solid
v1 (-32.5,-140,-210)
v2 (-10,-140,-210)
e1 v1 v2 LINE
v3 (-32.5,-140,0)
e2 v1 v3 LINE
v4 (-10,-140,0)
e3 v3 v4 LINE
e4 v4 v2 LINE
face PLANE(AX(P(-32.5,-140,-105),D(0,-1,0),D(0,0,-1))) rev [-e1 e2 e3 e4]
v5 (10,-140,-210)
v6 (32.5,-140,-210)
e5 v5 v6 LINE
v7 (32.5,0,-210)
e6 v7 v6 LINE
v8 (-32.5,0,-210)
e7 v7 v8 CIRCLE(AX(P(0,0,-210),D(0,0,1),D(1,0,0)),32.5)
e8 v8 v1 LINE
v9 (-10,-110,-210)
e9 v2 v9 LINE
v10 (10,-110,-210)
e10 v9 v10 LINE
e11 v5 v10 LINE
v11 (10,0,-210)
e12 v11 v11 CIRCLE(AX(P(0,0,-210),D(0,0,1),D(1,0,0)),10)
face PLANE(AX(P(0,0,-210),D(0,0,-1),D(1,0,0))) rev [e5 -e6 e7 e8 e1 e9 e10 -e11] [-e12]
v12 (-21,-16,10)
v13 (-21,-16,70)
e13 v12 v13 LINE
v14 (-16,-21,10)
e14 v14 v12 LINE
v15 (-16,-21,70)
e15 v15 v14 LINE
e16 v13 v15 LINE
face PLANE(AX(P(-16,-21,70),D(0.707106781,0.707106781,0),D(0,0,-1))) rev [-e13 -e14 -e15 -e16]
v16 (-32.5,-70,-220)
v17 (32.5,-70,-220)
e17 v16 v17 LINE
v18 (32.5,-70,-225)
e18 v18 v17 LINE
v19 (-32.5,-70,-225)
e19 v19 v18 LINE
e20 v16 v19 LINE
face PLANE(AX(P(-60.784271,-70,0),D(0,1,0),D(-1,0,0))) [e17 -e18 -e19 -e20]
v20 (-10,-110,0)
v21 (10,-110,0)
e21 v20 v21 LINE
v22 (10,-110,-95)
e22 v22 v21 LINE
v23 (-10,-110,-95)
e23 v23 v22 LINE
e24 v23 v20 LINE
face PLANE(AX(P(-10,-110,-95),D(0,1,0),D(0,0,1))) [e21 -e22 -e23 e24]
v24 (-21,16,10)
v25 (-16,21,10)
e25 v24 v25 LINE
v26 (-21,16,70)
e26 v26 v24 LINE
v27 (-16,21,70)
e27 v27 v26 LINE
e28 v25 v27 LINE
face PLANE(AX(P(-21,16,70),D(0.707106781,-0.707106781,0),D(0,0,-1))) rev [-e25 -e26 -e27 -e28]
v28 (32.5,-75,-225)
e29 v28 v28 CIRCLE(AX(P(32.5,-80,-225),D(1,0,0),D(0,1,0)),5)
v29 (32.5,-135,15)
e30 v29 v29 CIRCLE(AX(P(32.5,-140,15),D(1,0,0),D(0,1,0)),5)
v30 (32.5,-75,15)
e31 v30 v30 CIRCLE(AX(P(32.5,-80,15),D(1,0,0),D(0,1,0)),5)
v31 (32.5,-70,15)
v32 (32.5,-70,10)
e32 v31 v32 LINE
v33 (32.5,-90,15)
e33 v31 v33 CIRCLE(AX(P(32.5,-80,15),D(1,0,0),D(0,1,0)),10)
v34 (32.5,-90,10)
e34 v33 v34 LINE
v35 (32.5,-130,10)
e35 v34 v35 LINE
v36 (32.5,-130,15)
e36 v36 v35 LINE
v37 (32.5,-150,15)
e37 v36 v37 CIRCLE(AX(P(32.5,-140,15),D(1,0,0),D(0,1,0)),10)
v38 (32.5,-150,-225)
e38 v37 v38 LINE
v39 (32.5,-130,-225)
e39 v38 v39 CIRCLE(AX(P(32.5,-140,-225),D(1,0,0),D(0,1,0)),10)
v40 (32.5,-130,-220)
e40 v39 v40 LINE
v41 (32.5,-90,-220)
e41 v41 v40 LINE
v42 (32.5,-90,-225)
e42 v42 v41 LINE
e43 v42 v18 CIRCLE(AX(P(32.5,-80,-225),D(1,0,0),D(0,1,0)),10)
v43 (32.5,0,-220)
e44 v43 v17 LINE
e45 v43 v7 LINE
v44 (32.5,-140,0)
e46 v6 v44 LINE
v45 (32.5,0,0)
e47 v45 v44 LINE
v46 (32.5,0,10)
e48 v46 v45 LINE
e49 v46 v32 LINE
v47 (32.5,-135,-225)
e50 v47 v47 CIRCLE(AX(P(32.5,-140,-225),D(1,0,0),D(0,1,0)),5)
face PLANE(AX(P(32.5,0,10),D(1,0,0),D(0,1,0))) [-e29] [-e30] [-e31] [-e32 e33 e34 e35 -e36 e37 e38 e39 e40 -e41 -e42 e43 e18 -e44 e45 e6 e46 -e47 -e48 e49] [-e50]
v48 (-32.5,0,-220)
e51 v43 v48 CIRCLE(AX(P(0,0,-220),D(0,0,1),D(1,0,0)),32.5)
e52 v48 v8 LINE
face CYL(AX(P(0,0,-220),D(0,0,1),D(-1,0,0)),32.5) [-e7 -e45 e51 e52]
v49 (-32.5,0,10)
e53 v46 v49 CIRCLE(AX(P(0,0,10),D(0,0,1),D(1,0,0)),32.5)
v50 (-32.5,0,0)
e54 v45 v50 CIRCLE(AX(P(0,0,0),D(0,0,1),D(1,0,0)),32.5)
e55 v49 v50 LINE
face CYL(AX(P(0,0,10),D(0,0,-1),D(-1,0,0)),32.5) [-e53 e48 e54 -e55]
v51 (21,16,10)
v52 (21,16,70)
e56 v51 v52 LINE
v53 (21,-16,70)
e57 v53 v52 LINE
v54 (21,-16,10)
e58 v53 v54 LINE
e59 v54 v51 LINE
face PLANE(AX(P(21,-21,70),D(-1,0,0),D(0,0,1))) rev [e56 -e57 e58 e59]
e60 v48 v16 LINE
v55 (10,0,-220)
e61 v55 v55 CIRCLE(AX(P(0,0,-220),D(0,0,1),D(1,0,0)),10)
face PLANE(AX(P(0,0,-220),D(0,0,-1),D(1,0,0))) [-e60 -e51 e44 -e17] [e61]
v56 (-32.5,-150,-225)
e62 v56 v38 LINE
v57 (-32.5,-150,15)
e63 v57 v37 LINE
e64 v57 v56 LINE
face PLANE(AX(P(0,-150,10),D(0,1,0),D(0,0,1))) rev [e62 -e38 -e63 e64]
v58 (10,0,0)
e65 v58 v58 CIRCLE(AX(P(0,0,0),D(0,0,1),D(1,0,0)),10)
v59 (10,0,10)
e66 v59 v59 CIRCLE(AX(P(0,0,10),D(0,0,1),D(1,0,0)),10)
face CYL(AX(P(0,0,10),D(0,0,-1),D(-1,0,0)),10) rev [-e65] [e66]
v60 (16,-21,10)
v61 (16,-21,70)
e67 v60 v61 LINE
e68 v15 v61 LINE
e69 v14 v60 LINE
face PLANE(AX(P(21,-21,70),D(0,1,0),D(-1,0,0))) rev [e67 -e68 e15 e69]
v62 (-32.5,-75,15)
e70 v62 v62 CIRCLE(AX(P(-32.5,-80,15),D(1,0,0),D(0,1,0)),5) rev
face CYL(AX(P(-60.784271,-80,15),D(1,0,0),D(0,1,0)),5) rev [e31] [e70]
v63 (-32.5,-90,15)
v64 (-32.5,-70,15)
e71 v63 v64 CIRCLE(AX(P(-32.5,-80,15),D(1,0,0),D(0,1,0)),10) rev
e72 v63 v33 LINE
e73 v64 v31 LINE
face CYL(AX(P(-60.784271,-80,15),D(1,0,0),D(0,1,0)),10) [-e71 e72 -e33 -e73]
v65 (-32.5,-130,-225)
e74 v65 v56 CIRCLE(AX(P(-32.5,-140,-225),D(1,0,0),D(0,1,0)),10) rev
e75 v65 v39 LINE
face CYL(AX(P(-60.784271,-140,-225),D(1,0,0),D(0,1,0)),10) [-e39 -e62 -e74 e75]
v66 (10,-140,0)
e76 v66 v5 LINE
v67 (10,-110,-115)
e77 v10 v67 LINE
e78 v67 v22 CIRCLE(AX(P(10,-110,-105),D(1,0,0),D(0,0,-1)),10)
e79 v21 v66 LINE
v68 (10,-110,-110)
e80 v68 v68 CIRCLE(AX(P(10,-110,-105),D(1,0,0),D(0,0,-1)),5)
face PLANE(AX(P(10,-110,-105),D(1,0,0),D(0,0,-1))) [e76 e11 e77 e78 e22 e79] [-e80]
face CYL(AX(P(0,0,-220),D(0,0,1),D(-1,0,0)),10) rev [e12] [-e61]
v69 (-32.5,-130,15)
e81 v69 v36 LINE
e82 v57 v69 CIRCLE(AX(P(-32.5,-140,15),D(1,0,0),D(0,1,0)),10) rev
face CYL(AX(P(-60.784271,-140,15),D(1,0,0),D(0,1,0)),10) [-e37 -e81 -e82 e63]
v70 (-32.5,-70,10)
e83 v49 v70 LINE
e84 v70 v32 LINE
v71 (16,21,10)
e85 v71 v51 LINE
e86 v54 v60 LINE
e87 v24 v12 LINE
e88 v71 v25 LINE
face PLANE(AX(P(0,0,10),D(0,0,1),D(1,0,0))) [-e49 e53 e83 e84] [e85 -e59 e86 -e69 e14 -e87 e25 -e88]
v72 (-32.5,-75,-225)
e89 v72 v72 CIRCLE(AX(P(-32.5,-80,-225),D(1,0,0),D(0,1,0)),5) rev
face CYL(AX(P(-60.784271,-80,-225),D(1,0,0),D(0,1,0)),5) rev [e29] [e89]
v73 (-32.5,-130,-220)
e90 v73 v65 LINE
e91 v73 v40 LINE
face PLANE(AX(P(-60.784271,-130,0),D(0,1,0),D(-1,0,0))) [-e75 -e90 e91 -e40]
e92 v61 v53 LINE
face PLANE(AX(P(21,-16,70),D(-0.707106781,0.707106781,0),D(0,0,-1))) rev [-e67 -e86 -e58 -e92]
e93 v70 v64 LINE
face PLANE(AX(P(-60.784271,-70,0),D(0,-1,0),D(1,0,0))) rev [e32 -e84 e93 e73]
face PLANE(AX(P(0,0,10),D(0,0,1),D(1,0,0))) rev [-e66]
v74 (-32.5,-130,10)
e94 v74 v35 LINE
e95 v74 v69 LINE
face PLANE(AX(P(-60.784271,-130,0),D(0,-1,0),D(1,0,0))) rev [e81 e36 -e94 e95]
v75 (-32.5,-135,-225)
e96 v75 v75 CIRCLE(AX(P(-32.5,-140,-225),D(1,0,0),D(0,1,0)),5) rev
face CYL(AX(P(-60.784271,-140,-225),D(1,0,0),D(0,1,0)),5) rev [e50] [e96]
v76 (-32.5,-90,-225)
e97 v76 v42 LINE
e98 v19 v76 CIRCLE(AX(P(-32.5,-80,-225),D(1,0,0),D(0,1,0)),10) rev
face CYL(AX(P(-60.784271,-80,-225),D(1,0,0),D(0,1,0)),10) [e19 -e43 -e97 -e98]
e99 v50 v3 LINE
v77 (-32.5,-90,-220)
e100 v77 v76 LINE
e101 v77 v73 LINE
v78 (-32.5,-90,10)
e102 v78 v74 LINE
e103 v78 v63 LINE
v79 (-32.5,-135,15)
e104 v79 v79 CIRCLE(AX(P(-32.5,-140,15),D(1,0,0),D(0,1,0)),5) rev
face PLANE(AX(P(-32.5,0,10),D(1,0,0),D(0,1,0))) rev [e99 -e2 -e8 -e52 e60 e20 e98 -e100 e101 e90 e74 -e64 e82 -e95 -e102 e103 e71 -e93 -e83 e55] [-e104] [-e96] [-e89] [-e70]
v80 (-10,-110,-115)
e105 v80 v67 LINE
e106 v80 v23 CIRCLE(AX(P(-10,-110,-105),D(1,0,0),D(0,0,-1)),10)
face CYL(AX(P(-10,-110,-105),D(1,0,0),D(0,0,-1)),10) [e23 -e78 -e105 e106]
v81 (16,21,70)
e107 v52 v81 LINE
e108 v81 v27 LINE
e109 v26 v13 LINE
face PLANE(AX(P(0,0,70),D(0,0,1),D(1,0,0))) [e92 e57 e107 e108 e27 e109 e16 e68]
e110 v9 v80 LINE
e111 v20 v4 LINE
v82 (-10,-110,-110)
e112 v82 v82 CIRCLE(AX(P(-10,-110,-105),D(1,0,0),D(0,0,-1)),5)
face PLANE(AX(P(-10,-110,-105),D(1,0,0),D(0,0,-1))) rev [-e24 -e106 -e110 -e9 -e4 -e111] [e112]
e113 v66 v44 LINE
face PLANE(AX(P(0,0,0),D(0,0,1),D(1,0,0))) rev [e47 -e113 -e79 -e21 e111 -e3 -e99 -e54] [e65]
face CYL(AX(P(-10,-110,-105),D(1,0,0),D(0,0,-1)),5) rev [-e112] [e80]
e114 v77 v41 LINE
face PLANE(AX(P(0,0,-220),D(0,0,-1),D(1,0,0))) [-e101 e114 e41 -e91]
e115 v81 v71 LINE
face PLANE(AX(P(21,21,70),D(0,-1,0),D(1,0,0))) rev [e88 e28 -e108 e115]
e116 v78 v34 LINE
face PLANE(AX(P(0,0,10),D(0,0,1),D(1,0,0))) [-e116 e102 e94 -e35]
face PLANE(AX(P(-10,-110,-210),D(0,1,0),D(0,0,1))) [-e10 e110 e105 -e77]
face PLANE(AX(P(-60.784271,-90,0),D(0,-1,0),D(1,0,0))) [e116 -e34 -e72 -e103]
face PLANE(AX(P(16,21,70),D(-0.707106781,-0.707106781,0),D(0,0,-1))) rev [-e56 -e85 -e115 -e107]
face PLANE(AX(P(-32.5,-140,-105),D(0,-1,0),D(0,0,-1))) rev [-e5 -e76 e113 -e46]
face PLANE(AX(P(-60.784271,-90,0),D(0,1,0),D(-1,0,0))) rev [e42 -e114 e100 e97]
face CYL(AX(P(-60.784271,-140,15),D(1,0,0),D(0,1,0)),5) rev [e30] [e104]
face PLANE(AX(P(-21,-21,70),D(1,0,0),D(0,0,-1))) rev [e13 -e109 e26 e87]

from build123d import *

# Parameters (mm, degrees)
BOSS_EXTRUDE1_DEPTH       = 10
SKETCH2_W                 = 65
SKETCH2_H                 = 10
BOSS_EXTRUDE2_DEPTH       = 105
SKETCH3_W                 = 42
SKETCH3_H                 = 42
BOSS_EXTRUDE3_DEPTH       = 60
CHAMFER1_SIZE             = 5
BOSS_EXTRUDE6_START       = -235
BOSS_EXTRUDE6_OUTLINE_W   = 65
BOSS_EXTRUDE6_OUTLINE_H   = 20
BOSS_EXTRUDE6_DEPTH       = 15
BOSS_EXTRUDE6_START_2     = 10
BOSS_EXTRUDE6_2_OUTLINE_W = 65
BOSS_EXTRUDE6_2_OUTLINE_H = 20
BOSS_EXTRUDE6_2_DEPTH     = 15
BOSS_EXTRUDE6_START_3     = -32.5
BOSS_EXTRUDE6_3_OUTLINE_R = 5
BOSS_EXTRUDE6_3_DEPTH     = 65
BOSS_EXTRUDE9_DEPTH       = 10
BOSS_EXTRUDE9_DEPTH_BACK  = 10
SKETCH5_R                 = 5


with BuildPart() as part:
    # Sketch1 → Boss-Extrude1 (new body)
    with BuildSketch(Plane.XY):
        with BuildLine():
            Line((32.5, -150), (32.5, 0))
            ThreePointArc((32.5, 0), (0, -32.5), (-32.5, 0))
            Line((-32.5, 0), (-32.5, -150))
            Line((-32.5, -150), (32.5, -150))
        make_face()
        with BuildLine():
            ThreePointArc((-10, 0), (0, 10), (10, 0))
            Line((10, 0), (32.5, 0))
            ThreePointArc((32.5, 0), (0, 32.5), (-32.5, 0))
            Line((-32.5, 0), (-10, 0))
        make_face()
        with BuildLine():
            Line((32.5, 0), (10, 0))
            ThreePointArc((10, 0), (0, -10), (-10, 0))
            Line((-10, 0), (-32.5, 0))
            ThreePointArc((-32.5, 0), (0, -32.5), (32.5, 0))
        make_face()
    extrude(amount=BOSS_EXTRUDE1_DEPTH)

    # Sketch2 → Boss-Extrude2 (add)
    with BuildSketch(Plane(origin=(0, 0, 0), x_dir=(-1, 0, 0), z_dir=(0, 0, -1))):
        with Locations((0, -145)):
            Rectangle(SKETCH2_W, SKETCH2_H)
    extrude(amount=BOSS_EXTRUDE2_DEPTH)

    # Mirror1: part across plane


with BuildPart() as part_1:
    add(part.part)
    add(part.part.mirror(Plane(origin=(0, 0, -105), x_dir=(1, 0, 0), z_dir=(0, 0, -1))))

    # Sketch3 → Boss-Extrude3 (add)
    with BuildSketch(Plane.XY.offset(10)):
        Rectangle(SKETCH3_W, SKETCH3_H)
    extrude(amount=BOSS_EXTRUDE3_DEPTH)

    # Chamfer1
    chamfer1_edges = [part_1.edges().sort_by_distance(p)[0] for p in [
        (-21, 21, 40),
        (-21, -21, 40),
        (21, -21, 40),
        (21, 21, 40),
    ]]
    chamfer(chamfer1_edges, length=CHAMFER1_SIZE)

    # Boss-Extrude6: read off the stored shape, not the designer's step
    # Boss-Extrude6 outline → Boss-Extrude6 (add)
    with BuildSketch(Plane.XY.offset(BOSS_EXTRUDE6_START)):
        with Locations((0, -140)):
            Rectangle(BOSS_EXTRUDE6_OUTLINE_W, BOSS_EXTRUDE6_OUTLINE_H)
        with Locations((0, -80)):
            Rectangle(BOSS_EXTRUDE6_OUTLINE_W, BOSS_EXTRUDE6_OUTLINE_H)
    extrude(amount=BOSS_EXTRUDE6_DEPTH)

    # Boss-Extrude6 2 outline → Boss-Extrude6 2 (add)
    with BuildSketch(Plane.XY.offset(BOSS_EXTRUDE6_START_2)):
        with Locations((0, -140)):
            Rectangle(BOSS_EXTRUDE6_2_OUTLINE_W, BOSS_EXTRUDE6_2_OUTLINE_H)
        with Locations((0, -80)):
            Rectangle(BOSS_EXTRUDE6_2_OUTLINE_W, BOSS_EXTRUDE6_2_OUTLINE_H)
    extrude(amount=BOSS_EXTRUDE6_2_DEPTH)

    # Boss-Extrude6 3 outline → Boss-Extrude6 3 (cut)
    with BuildSketch(Plane.YZ.offset(BOSS_EXTRUDE6_START_3)):
        with BuildLine():
            ThreePointArc((-90, 15), (-87.071067812, 22.071067812), (-80, 25))
            Line((-80, 25), (-90, 25))
            Line((-90, 25), (-90, 15))
        make_face()
        with BuildLine():
            ThreePointArc((-80, 25), (-72.928932188, 22.071067812), (-70, 15))
            Line((-70, 15), (-70, 25))
            Line((-70, 25), (-80, 25))
        make_face()
        with Locations((-80, 15)):
            Circle(BOSS_EXTRUDE6_3_OUTLINE_R)
        with BuildLine():
            ThreePointArc((-130, -225), (-132.928932188, -232.071067812), (-140, -235))
            Line((-140, -235), (-130, -235))
            Line((-130, -235), (-130, -225))
        make_face()
        with BuildLine():
            ThreePointArc((-140, -235), (-147.071067812, -232.071067812), (-150, -225))
            Line((-150, -225), (-150, -235))
            Line((-150, -235), (-140, -235))
        make_face()
        with BuildLine():
            ThreePointArc((-150, 15), (-147.071067812, 22.071067812), (-140, 25))
            Line((-140, 25), (-150, 25))
            Line((-150, 25), (-150, 15))
        make_face()
        with BuildLine():
            ThreePointArc((-140, 25), (-132.928932188, 22.071067812), (-130, 15))
            Line((-130, 15), (-130, 25))
            Line((-130, 25), (-140, 25))
        make_face()
        with Locations((-140, 15)):
            Circle(BOSS_EXTRUDE6_3_OUTLINE_R)
        with BuildLine():
            ThreePointArc((-70, -225), (-72.928932188, -232.071067812), (-80, -235))
            Line((-80, -235), (-70, -235))
            Line((-70, -235), (-70, -225))
        make_face()
        with BuildLine():
            ThreePointArc((-80, -235), (-87.071067812, -232.071067812), (-90, -225))
            Line((-90, -225), (-90, -235))
            Line((-90, -235), (-80, -235))
        make_face()
        with Locations((-80, -225)):
            Circle(BOSS_EXTRUDE6_3_OUTLINE_R)
        with Locations((-140, -225)):
            Circle(BOSS_EXTRUDE6_3_OUTLINE_R)
    extrude(amount=BOSS_EXTRUDE6_3_DEPTH, mode=Mode.SUBTRACT)

    # Sketch5 → Boss-Extrude9 (add, two sides: drawn at the far end of the back side and taken through both)
    with BuildSketch(Plane(origin=(0, 0, 0), x_dir=(0, 0, -1), z_dir=(1, 0, 0)).offset(-BOSS_EXTRUDE9_DEPTH_BACK)):
        with BuildLine():
            Line((95, -110), (0, -110))
            Line((0, -110), (0, -140))
            Line((0, -140), (210, -140))
            Line((210, -140), (210, -110))
            Line((210, -110), (115, -110))
            ThreePointArc((115, -110), (105, -100), (95, -110))
        make_face()
        with Locations((105, -110)):
            Circle(SKETCH5_R, mode=Mode.SUBTRACT)
    extrude(amount=BOSS_EXTRUDE9_DEPTH + BOSS_EXTRUDE9_DEPTH_BACK)


solid = part_1.part
